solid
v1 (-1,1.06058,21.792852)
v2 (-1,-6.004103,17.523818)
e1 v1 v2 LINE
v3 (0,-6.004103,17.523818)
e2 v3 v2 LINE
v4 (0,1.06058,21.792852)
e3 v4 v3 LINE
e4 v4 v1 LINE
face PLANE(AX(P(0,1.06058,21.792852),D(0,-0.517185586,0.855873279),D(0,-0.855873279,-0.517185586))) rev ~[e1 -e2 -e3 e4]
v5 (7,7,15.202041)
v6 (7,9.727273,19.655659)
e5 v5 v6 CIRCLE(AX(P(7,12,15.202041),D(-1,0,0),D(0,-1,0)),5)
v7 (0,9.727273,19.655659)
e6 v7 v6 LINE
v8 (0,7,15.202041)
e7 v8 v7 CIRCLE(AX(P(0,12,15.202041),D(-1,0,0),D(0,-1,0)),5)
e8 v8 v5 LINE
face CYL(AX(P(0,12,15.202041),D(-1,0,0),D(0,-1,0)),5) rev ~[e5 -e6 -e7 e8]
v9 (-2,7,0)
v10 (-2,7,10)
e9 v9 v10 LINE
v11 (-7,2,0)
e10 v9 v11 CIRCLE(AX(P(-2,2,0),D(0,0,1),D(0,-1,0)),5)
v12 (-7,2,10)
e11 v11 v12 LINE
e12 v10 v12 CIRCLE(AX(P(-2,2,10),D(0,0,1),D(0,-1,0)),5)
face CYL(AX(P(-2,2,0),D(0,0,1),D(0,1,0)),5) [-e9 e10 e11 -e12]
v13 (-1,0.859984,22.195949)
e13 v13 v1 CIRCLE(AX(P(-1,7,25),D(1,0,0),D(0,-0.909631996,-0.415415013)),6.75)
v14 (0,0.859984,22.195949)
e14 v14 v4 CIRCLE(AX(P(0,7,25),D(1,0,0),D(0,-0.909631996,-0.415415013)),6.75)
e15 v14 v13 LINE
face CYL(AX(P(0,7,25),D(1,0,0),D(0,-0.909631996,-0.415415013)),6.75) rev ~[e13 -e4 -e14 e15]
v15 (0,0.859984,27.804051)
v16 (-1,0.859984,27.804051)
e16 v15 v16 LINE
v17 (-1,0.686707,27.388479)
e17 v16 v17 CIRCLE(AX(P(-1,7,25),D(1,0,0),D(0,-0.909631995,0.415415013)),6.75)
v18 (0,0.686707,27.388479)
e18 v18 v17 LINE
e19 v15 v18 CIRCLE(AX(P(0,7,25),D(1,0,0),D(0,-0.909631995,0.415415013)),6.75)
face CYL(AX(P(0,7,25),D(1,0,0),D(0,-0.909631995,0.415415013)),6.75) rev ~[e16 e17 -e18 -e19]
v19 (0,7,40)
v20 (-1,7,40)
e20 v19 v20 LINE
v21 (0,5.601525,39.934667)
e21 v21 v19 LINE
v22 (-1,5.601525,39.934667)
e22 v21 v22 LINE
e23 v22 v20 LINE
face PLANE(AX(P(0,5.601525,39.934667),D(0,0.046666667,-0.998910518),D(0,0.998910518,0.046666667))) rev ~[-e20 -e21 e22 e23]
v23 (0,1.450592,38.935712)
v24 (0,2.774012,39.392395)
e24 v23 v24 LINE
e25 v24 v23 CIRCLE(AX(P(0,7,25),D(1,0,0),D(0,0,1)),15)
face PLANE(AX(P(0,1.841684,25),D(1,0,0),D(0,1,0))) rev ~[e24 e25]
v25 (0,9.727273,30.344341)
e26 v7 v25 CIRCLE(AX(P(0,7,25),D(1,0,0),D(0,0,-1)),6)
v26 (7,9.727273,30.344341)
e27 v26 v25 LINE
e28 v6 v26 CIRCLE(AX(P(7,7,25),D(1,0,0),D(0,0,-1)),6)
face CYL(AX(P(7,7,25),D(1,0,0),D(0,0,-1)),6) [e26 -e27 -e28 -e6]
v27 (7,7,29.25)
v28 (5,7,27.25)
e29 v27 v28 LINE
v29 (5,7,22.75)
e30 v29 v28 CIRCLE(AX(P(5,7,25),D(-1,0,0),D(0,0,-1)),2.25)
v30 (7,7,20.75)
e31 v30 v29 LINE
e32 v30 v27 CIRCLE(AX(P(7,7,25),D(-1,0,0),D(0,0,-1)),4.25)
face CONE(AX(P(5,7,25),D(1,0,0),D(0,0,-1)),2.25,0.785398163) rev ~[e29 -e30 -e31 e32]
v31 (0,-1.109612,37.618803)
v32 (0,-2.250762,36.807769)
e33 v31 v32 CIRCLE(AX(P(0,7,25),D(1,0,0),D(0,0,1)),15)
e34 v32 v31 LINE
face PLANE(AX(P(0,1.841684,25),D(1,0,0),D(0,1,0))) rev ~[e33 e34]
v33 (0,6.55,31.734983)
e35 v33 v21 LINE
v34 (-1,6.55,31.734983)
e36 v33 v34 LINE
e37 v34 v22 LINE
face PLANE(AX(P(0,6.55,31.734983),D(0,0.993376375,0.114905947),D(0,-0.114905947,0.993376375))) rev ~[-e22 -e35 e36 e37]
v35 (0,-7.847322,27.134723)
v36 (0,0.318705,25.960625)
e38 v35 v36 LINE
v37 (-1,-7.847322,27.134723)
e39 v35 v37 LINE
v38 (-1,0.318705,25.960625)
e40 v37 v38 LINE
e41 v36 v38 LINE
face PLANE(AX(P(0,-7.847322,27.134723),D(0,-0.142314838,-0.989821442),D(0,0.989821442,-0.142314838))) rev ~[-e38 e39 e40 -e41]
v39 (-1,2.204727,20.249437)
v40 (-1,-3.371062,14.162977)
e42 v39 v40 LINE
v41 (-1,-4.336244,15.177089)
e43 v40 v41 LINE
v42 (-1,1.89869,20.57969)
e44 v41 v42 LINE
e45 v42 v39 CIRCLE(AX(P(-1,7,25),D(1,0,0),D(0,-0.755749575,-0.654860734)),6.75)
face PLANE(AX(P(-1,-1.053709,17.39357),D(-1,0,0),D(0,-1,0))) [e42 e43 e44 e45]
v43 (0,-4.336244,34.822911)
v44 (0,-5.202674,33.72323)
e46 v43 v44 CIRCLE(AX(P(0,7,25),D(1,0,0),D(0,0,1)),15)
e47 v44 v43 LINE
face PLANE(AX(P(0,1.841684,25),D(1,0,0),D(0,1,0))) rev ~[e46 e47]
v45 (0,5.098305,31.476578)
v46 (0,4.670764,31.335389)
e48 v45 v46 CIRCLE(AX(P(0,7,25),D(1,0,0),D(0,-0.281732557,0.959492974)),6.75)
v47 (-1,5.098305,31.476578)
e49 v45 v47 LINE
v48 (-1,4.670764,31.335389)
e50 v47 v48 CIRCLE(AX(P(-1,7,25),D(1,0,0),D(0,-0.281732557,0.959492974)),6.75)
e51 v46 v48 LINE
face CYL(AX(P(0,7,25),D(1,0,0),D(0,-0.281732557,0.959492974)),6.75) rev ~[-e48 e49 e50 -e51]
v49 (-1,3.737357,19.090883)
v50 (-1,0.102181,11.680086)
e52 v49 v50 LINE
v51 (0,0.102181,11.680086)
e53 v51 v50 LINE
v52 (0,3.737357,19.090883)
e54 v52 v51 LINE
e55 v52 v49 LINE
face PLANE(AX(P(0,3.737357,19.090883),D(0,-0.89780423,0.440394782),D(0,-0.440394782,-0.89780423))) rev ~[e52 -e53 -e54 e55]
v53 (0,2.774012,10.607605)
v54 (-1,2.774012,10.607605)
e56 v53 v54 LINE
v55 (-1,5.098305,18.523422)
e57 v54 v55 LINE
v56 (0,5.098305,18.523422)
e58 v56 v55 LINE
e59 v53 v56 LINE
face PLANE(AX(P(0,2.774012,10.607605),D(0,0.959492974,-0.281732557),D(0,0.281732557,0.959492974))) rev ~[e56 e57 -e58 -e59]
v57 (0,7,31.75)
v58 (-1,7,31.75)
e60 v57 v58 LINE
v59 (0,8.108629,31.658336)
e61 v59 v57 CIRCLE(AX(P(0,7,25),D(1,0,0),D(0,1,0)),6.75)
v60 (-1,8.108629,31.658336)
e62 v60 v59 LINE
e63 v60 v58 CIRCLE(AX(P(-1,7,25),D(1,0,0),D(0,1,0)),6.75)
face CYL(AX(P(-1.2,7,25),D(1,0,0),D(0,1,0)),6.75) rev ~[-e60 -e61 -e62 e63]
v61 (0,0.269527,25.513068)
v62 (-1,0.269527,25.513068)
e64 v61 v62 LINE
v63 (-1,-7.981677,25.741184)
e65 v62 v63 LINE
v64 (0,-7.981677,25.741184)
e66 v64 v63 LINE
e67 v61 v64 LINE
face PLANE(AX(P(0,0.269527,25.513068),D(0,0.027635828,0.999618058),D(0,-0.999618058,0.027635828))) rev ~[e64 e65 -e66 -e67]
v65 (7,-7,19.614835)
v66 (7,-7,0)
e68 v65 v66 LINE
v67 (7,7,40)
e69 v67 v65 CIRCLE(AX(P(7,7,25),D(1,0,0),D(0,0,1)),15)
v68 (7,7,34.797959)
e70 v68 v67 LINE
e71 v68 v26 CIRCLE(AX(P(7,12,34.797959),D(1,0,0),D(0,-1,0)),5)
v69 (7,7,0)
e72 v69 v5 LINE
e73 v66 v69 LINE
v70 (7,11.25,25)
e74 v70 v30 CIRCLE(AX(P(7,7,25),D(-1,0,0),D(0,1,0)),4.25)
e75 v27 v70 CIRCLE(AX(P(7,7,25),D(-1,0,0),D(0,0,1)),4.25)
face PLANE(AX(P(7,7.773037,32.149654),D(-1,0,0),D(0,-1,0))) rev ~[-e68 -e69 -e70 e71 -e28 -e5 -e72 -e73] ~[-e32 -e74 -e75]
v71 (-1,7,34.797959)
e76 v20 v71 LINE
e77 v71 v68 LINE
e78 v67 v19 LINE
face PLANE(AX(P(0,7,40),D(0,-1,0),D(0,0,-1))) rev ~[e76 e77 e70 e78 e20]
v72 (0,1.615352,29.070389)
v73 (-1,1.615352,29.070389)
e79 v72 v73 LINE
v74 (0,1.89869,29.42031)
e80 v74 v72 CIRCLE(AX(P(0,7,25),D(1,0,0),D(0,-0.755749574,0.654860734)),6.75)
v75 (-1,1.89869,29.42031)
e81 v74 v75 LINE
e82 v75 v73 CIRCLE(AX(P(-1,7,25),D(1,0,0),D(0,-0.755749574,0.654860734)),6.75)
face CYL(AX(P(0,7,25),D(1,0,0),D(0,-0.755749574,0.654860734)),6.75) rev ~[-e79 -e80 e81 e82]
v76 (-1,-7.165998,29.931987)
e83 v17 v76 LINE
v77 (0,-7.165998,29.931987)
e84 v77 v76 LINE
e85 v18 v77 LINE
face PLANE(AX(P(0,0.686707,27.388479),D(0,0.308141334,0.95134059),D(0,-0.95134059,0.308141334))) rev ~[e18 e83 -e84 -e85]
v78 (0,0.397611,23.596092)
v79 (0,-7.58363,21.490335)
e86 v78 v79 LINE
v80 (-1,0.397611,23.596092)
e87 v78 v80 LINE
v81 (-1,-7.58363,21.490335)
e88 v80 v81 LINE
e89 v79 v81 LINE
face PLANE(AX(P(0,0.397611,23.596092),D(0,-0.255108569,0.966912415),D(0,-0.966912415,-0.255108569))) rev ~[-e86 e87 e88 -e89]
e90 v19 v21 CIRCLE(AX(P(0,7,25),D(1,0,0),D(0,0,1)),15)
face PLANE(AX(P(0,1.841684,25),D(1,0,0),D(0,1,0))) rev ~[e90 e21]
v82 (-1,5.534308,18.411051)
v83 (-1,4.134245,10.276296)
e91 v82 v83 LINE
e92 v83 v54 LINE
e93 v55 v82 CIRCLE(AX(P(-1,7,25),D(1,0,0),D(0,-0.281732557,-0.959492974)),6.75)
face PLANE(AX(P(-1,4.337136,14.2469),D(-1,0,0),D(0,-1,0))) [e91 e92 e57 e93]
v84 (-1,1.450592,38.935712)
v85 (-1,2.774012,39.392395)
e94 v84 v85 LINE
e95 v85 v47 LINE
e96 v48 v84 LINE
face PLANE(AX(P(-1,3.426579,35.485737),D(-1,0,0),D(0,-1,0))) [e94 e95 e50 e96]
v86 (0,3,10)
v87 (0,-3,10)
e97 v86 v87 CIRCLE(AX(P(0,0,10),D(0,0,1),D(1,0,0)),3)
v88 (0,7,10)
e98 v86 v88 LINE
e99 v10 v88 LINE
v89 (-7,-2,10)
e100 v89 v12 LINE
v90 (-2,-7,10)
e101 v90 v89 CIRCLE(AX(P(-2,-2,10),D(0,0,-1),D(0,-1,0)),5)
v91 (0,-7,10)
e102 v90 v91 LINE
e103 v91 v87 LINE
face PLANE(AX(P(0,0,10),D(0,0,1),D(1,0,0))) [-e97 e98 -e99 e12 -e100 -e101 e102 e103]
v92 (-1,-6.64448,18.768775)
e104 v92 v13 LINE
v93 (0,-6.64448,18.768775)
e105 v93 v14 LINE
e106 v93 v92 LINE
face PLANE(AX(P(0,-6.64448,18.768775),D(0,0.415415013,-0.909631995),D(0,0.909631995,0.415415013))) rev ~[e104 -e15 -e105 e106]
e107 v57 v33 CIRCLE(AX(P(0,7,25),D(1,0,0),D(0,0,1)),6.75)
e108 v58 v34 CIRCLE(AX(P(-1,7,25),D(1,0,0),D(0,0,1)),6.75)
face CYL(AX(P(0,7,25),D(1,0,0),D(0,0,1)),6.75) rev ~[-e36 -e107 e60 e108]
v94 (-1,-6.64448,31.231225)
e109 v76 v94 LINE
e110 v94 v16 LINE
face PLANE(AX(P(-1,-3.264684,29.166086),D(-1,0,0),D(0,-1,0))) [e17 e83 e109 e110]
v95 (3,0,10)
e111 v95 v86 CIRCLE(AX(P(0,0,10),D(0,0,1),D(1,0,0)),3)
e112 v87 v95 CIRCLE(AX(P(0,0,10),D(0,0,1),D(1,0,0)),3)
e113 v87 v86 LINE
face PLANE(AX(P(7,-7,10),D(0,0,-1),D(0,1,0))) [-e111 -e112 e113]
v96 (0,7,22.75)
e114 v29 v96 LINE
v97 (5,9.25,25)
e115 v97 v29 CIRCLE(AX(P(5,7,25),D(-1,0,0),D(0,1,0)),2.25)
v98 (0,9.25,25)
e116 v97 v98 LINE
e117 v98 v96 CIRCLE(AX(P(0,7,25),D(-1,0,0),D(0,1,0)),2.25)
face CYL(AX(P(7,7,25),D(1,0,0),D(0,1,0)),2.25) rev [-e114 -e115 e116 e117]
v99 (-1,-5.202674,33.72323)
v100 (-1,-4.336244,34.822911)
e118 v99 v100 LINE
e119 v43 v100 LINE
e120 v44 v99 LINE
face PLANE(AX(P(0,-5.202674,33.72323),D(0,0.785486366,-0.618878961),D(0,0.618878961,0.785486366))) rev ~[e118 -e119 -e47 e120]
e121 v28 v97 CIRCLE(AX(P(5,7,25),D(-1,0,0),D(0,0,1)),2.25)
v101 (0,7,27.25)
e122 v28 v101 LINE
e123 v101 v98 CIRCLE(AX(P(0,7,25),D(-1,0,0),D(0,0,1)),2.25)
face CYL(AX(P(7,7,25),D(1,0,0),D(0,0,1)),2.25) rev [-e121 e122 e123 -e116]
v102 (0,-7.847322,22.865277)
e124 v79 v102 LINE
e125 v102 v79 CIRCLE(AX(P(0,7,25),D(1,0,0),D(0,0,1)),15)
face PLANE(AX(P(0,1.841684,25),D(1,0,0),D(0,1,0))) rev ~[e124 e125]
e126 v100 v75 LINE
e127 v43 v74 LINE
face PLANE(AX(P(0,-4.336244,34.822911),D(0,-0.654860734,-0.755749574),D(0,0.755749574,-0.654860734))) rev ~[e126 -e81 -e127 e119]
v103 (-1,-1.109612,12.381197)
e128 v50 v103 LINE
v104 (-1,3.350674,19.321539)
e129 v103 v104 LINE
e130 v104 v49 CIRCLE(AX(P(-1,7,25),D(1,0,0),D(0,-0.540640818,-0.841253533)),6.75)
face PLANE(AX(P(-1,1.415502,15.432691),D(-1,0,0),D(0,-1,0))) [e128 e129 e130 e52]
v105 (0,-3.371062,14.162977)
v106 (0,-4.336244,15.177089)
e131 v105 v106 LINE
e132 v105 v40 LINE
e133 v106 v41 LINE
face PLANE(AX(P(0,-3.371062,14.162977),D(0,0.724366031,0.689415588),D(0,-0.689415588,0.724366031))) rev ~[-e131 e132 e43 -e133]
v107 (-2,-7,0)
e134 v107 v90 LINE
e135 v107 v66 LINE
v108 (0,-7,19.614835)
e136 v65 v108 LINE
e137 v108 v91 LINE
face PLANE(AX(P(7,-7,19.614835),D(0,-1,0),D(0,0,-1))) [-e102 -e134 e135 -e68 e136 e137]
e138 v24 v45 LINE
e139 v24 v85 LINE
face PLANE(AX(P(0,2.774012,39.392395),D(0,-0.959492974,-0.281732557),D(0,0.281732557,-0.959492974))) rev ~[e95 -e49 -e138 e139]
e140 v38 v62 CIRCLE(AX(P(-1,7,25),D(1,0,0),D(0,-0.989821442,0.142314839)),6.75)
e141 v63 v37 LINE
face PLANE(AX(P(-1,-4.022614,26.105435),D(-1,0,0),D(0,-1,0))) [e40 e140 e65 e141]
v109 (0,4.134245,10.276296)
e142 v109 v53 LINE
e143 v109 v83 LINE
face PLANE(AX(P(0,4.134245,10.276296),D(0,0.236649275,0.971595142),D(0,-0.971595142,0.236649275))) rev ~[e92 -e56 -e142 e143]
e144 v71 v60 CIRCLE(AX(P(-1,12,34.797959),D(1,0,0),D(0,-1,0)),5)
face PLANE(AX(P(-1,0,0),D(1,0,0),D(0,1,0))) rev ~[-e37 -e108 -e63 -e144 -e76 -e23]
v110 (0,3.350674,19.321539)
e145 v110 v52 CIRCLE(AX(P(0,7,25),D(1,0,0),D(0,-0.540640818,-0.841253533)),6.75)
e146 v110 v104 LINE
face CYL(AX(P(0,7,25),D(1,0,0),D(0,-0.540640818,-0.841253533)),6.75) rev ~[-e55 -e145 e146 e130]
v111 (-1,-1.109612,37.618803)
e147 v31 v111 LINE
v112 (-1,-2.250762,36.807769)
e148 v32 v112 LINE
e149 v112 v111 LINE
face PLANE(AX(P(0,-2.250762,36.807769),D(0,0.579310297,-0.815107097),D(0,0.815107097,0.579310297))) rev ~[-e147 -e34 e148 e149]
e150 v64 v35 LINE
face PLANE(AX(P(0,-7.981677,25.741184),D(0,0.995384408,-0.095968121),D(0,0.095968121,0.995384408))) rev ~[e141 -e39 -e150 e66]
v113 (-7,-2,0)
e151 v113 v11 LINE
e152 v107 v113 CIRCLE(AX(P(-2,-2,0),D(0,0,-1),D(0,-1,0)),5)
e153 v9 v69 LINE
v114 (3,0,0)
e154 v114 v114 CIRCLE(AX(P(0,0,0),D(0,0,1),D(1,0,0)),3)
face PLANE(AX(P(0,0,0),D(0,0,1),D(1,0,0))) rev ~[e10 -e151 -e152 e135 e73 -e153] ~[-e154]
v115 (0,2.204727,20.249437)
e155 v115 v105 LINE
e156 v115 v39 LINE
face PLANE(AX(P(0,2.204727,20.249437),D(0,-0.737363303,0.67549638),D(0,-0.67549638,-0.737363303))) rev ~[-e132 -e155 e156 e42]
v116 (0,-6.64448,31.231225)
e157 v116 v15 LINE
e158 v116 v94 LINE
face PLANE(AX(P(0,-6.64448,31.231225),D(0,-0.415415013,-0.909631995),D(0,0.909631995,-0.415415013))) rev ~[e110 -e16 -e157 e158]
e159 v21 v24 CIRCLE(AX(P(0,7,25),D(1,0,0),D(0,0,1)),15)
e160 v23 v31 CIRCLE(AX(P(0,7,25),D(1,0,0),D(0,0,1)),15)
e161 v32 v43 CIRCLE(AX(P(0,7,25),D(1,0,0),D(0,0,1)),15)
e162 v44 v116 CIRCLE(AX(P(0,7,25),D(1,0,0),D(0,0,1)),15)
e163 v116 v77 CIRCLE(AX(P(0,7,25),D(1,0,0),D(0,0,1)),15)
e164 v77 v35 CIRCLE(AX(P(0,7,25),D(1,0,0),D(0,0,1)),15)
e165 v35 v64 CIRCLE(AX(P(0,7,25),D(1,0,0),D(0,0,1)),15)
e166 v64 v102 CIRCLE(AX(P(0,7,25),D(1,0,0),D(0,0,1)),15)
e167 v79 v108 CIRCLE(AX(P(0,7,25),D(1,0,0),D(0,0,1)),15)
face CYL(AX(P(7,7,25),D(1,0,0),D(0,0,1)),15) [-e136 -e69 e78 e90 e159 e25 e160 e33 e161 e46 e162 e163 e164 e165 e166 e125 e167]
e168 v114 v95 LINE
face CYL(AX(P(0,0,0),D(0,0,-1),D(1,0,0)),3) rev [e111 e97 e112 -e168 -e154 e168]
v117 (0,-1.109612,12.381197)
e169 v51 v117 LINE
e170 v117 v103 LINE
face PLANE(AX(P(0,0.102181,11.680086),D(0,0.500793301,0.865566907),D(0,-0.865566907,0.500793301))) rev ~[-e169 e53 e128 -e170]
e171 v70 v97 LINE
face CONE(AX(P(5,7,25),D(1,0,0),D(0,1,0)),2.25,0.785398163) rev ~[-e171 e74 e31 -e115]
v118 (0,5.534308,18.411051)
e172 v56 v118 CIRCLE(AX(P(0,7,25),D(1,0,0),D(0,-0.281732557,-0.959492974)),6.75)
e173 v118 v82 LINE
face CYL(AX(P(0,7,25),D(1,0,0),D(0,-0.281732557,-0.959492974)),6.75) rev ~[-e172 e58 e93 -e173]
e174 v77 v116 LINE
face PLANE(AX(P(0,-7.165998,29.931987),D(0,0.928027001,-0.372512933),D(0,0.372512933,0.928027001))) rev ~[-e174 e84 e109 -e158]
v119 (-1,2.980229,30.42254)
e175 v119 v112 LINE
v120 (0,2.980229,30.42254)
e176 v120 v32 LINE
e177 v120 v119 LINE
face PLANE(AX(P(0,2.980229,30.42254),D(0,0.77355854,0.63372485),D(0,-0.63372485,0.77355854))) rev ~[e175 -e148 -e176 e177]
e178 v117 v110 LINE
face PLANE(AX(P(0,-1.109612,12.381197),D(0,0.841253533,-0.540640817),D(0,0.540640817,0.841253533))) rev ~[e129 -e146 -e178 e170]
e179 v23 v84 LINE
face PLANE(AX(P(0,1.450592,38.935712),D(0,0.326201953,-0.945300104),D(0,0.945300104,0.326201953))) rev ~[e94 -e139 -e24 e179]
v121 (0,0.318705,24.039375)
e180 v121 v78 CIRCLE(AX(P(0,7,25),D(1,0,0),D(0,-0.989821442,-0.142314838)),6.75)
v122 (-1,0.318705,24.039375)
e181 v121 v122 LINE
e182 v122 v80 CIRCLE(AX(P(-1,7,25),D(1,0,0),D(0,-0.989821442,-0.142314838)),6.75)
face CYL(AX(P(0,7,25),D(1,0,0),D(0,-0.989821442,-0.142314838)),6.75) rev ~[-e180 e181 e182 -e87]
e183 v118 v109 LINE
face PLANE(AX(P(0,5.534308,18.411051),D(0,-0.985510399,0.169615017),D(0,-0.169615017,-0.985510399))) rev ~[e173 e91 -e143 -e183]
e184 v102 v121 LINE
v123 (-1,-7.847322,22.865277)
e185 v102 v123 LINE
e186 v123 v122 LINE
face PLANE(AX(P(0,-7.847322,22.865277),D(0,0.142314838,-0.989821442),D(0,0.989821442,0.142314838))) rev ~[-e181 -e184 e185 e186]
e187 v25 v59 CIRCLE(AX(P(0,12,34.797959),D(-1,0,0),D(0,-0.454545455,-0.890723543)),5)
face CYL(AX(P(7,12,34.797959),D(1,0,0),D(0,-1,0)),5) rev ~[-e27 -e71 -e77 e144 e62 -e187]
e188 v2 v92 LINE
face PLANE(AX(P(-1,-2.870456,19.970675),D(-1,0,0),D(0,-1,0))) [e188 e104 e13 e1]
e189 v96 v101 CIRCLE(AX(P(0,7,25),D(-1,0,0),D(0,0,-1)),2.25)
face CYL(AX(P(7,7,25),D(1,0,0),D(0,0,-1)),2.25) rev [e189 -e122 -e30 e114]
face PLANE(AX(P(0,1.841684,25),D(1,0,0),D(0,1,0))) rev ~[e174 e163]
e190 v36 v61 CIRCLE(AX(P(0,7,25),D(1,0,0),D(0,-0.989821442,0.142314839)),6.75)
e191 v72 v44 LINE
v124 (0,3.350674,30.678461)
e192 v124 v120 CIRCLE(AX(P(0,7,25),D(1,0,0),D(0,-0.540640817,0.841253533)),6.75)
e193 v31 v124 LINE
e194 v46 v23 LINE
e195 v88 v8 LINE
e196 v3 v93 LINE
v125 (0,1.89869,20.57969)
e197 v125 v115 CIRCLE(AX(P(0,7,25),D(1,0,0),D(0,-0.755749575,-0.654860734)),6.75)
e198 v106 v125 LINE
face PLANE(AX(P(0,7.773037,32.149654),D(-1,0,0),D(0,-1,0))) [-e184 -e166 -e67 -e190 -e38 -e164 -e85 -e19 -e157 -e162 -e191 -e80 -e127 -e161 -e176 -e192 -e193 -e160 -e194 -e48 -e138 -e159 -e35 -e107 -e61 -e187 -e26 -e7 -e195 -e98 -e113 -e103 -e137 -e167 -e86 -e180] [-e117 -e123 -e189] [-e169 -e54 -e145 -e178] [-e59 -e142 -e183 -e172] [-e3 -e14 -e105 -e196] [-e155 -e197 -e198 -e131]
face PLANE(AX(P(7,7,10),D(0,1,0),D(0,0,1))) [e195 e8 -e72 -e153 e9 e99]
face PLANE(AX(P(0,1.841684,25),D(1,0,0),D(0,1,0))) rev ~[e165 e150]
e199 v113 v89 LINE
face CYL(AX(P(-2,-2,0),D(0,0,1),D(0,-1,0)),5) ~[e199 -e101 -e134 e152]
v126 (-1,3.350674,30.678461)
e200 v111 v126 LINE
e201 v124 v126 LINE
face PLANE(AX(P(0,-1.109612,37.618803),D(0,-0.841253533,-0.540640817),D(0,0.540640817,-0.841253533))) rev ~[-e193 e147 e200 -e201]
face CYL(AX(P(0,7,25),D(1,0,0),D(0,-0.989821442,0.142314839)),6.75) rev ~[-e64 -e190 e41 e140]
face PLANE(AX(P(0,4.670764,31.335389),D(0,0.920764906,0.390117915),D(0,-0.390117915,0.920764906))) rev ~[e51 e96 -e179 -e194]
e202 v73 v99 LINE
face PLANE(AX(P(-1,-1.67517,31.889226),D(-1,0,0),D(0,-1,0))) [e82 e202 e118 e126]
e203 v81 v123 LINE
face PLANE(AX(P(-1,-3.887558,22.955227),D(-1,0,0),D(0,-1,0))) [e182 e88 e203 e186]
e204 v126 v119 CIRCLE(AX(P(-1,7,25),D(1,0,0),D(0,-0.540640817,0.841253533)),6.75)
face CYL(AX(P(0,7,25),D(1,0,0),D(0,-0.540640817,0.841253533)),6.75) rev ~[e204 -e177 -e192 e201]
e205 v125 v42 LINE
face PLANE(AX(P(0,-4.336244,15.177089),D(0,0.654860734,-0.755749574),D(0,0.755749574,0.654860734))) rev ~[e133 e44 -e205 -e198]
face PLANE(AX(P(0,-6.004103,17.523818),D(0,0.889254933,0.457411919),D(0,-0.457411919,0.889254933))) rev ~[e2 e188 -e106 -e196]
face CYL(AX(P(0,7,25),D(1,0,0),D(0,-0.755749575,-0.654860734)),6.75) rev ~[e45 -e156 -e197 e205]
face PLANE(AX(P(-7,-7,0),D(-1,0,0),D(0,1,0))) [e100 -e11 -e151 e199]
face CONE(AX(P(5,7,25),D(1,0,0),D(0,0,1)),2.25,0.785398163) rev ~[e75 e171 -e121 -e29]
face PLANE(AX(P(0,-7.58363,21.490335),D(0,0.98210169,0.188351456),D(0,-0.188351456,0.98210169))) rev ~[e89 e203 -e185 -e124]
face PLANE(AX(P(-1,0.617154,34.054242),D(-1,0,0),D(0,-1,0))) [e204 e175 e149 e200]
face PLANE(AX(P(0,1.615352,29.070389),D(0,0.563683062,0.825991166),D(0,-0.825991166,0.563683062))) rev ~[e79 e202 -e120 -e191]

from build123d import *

# Parameters (mm, degrees)
F0_W         = 14
F0_H         = 14
F0_R         = 3
F1_DEPTH     = 10
F3_DEPTH     = 7
F5_DEPTH     = 1
F6_T1_DEPTH  = 7
F6_T6_DEPTH  = 7
F6_S7_R      = 6.75
F6_T8_DEPTH  = 6
F6_T12_DEPTH = 7
F6_S13_R     = 6.75
F6_T14_DEPTH = 6
F6_T18_DEPTH = 16.4948974278
F6_S20_R     = 6.75
F6_T21_DEPTH = 10
F7_R         = 5
F8_SIZE      = 2


# Not quite as in the source:
# - a fillet or chamfer that OpenCascade refuses, or shapes differently, is made with other operations: its cross-section is extruded or revolved along the edge and cut away or added


with BuildPart() as f1:
    # F0 (on Top) → F1 (new body)
    with BuildSketch(Plane.XY):
        Rectangle(F0_W, F0_H)
        Circle(F0_R, mode=Mode.SUBTRACT)
    extrude(amount=F1_DEPTH)

    # F2 (on face) → F3 (join)
    with BuildSketch(Plane.YZ.offset(7)):
        with BuildLine():
            Line((7, 31), (7, 40))
            ThreePointArc((7, 40), (-5.3648184804, 33.4918351342), (-7, 19.6148351929))
            ThreePointArc((-7, 19.6148351929), (-1.4918351342, 12.6351815196), (7, 10))
            Line((7, 10), (7, 19))
            Line((7, 19), (7, 22.75))
            ThreePointArc((7, 22.75), (4.75, 25), (7, 27.25))
            Line((7, 27.25), (7, 31))
        make_face()
        with BuildLine():
            ThreePointArc((7, 19), (13, 25), (7, 31))
            Line((7, 31), (7, 27.25))
            ThreePointArc((7, 27.25), (8.5909902577, 26.5909902577), (9.25, 25))
            ThreePointArc((9.25, 25), (8.5909902577, 23.4090097423), (7, 22.75))
            Line((7, 22.75), (7, 19))
        make_face()
        with BuildLine():
            ThreePointArc((7, 10), (-1.4918351342, 12.6351815196), (-7, 19.6148351929))
            Line((-7, 19.6148351929), (-7, 10))
            Line((-7, 10), (7, 10))
        make_face()
    extrude(amount=-F3_DEPTH)

    # F4 (on face) → F5 (join)
    with BuildSketch(Plane(origin=(0, 0, 0), x_dir=(0, -1, 0), z_dir=(-1, 0, 0))):
        with BuildLine():
            Line((-5.6015252753, 39.9346666667), (-7, 40))
            Line((-7, 40), (-7, 31.75))
            ThreePointArc((-7, 31.75), (-6.7748747563, 31.7462447795), (-6.55, 31.7349832962))
            Line((-6.55, 31.7349832962), (-5.6015252753, 39.9346666667))
        make_face()
        with BuildLine():
            Line((-1.4505915023, 38.9357118701), (-2.7740116474, 39.3923946042))
            Line((-2.7740116474, 39.3923946042), (-5.0983052413, 31.4765775719))
            ThreePointArc((-5.0983052413, 31.4765775719), (-4.8833571197, 31.4095493537), (-4.6707640976, 31.3353894995))
            Line((-4.6707640976, 31.3353894995), (-1.4505915023, 38.9357118701))
        make_face()
        with BuildLine():
            Line((2.2507621978, 36.8077685766), (1.1096122618, 37.6188029925))
            Line((1.1096122618, 37.6188029925), (-3.3506744822, 30.6784613466))
            ThreePointArc((-3.3506744822, 30.6784613466), (-3.1633173011, 30.5535903583), (-2.9802290354, 30.4225401236))
            Line((-2.9802290354, 30.4225401236), (2.2507621978, 36.8077685766))
        make_face()
        with BuildLine():
            Line((5.2026741611, 33.7232300966), (4.3362436153, 34.8229110092))
            Line((4.3362436153, 34.8229110092), (-1.8986903731, 29.4203099541))
            ThreePointArc((-1.8986903731, 29.4203099541), (-1.7541026971, 29.2477125006), (-1.6153519103, 29.070388796))
            Line((-1.6153519103, 29.070388796), (5.2026741611, 33.7232300966))
        make_face()
        with BuildLine():
            Line((7.1659980359, 29.9319873933), (6.6444799303, 31.231225195))
            Line((6.6444799303, 31.231225195), (-0.8599840314, 27.8040513378))
            ThreePointArc((-0.8599840314, 27.8040513378), (-0.7698794941, 27.5977102382), (-0.6867069498, 27.3884787756))
            Line((-0.6867069498, 27.3884787756), (7.1659980359, 29.9319873933))
        make_face()
        with BuildLine():
            Line((7.9816769983, 25.7411844029), (7.8473216282, 27.1347225741))
            Line((7.8473216282, 27.1347225741), (-0.3187052673, 25.9606251583))
            ThreePointArc((-0.3187052673, 25.9606251583), (-0.2903836024, 25.7372569414), (-0.2695274455, 25.5130684097))
            Line((-0.2695274455, 25.5130684097), (7.9816769983, 25.7411844029))
        make_face()
        with BuildLine():
            Line((-0.3976107999, 23.5960922926), (7.5836295897, 21.4903350603))
            Line((7.5836295897, 21.4903350603), (7.8473216282, 22.8652774259))
            Line((7.8473216282, 22.8652774259), (-0.3187052673, 24.0393748417))
            ThreePointArc((-0.3187052673, 24.0393748417), (-0.3544609277, 23.8170754719), (-0.3976107999, 23.5960922926))
        make_face()
        with BuildLine():
            ThreePointArc((-0.8599840314, 22.1959486622), (-0.9569203061, 21.9927275126), (-1.0605804615, 21.7928524285))
            Line((-1.0605804615, 21.7928524285), (6.004103244, 17.5238178982))
            Line((6.004103244, 17.5238178982), (6.6444799303, 18.768774805))
            Line((6.6444799303, 18.768774805), (-0.8599840314, 22.1959486622))
        make_face()
        with BuildLine():
            ThreePointArc((-1.8986903731, 20.5796900459), (-2.0489540617, 20.4120108852), (-2.2047265709, 20.2494365871))
            Line((-2.2047265709, 20.2494365871), (3.3710617919, 14.1629765475))
            Line((3.3710617919, 14.1629765475), (4.3362436153, 15.1770889908))
            Line((4.3362436153, 15.1770889908), (-1.8986903731, 20.5796900459))
        make_face()
        with BuildLine():
            ThreePointArc((-3.3506744822, 19.3215386534), (-3.5420921143, 19.2029858501), (-3.737357215, 19.0908831407))
            Line((-3.737357215, 19.0908831407), (-0.1021814076, 11.6800863867))
            Line((-0.1021814076, 11.6800863867), (1.1096122618, 12.3811970075))
            Line((1.1096122618, 12.3811970075), (-3.3506744822, 19.3215386534))
        make_face()
        with BuildLine():
            ThreePointArc((-5.0983052413, 18.5234224281), (-5.3153692987, 18.4636004253), (-5.5343077738, 18.4110511993))
            Line((-5.5343077738, 18.4110511993), (-4.1342448465, 10.2762964102))
            Line((-4.1342448465, 10.2762964102), (-2.7740116474, 10.6076053958))
            Line((-2.7740116474, 10.6076053958), (-5.0983052413, 18.5234224281))
        make_face()
    extrude(amount=F5_DEPTH)

    # F6: fillet of radius 5 on 2 edges, made by hand

    # F6_s2 → F6_t1 (join)
    with BuildSketch(Plane.YZ):
        with BuildLine():
            ThreePointArc((7, 15.2020410289), (7.7359856729, 17.8132058682), (9.7272727273, 19.655658743))
            ThreePointArc((9.7272727273, 19.655658743), (8.4024892973, 19.1662170274), (7, 19))
            Line((7, 19), (7, 15.2020410289))
        make_face()
    extrude(amount=F6_T1_DEPTH)


with BuildPart() as f6_tool4:
    # F6_s5 → F6_t6 (new body)
    with BuildSketch(Plane.YZ.offset(7)):
        with BuildLine():
            ThreePointArc((7, 34.7979589711), (7.7359856729, 32.1867941318), (9.7272727273, 30.344341257))
            ThreePointArc((9.7272727273, 30.344341257), (8.4024892973, 30.8337829726), (7, 31))
            Line((7, 31), (7, 34.7979589711))
        make_face()
    extrude(amount=-F6_T6_DEPTH)

    # F6_s7 → F6_t8 (cut, symmetric)
    with BuildSketch(Plane.YZ.offset(3.5)):
        with Locations((7, 25)):
            Circle(F6_S7_R)
    extrude(amount=F6_T8_DEPTH, both=True, mode=Mode.SUBTRACT)


with BuildPart() as f1_1:
    add(f1.part)

    # F6_t3: union F6_tool4
    add(f6_tool4.part)


with BuildPart() as f6_tool10:
    # F6_s11 → F6_t12 (new body)
    with BuildSketch(Plane.YZ.offset(7)):
        with BuildLine():
            ThreePointArc((7, 34.7979589711), (7.7359856729, 32.1867941318), (9.7272727273, 30.344341257))
            ThreePointArc((9.7272727273, 30.344341257), (8.4024892973, 30.8337829726), (7, 31))
            Line((7, 31), (7, 34.7979589711))
        make_face()
    extrude(amount=-F6_T12_DEPTH)

    # F6_s13 → F6_t14 (intersect, symmetric)
    with BuildSketch(Plane.YZ.offset(3.5)):
        with Locations((7, 25)):
            Circle(F6_S13_R)
    extrude(amount=F6_T14_DEPTH, both=True, mode=Mode.INTERSECT)


with BuildPart() as f1_2:
    add(f1_1.part)

    # F6_t9: union F6_tool10
    add(f6_tool10.part)


with BuildPart() as f6_tool16:
    # F6_s17 → F6_t18 (new body)
    with BuildSketch(Plane.YZ.offset(7)):
        with BuildLine():
            ThreePointArc((7, 34.7979589711), (7.7359856729, 32.1867941318), (9.7272727273, 30.344341257))
            ThreePointArc((9.7272727273, 30.344341257), (8.4024892973, 30.8337829726), (7, 31))
            Line((7, 31), (7, 34.7979589711))
        make_face()
    extrude(amount=-F6_T18_DEPTH)

    split(bisect_by=Plane.YZ, keep=Keep.BOTTOM)

    # F6_s20 → F6_t21 (cut, symmetric)
    with BuildSketch(Plane.YZ.offset(-1.2)):
        with Locations((7, 25)):
            Circle(F6_S20_R)
    extrude(amount=F6_T21_DEPTH, both=True, mode=Mode.SUBTRACT)

    split(bisect_by=Plane.YZ.offset(-1), keep=Keep.TOP)


with BuildPart() as f1_3:
    add(f1_2.part)

    # F6_t15: union F6_tool16
    add(f6_tool16.part)

    # F7
    f7_edges = [f1_3.edges().sort_by_distance(p)[0] for p in [
        (-7, 7, 5),
        (-7, -7, 5),
    ]]
    fillet(f7_edges, radius=F7_R)

    # F8
    f8_edges = [f1_3.edges().sort_by_distance(p)[0] for p in [
        (7, 7, 22.75),
    ]]
    chamfer(f8_edges, length=F8_SIZE)


solid = f1_3.part
